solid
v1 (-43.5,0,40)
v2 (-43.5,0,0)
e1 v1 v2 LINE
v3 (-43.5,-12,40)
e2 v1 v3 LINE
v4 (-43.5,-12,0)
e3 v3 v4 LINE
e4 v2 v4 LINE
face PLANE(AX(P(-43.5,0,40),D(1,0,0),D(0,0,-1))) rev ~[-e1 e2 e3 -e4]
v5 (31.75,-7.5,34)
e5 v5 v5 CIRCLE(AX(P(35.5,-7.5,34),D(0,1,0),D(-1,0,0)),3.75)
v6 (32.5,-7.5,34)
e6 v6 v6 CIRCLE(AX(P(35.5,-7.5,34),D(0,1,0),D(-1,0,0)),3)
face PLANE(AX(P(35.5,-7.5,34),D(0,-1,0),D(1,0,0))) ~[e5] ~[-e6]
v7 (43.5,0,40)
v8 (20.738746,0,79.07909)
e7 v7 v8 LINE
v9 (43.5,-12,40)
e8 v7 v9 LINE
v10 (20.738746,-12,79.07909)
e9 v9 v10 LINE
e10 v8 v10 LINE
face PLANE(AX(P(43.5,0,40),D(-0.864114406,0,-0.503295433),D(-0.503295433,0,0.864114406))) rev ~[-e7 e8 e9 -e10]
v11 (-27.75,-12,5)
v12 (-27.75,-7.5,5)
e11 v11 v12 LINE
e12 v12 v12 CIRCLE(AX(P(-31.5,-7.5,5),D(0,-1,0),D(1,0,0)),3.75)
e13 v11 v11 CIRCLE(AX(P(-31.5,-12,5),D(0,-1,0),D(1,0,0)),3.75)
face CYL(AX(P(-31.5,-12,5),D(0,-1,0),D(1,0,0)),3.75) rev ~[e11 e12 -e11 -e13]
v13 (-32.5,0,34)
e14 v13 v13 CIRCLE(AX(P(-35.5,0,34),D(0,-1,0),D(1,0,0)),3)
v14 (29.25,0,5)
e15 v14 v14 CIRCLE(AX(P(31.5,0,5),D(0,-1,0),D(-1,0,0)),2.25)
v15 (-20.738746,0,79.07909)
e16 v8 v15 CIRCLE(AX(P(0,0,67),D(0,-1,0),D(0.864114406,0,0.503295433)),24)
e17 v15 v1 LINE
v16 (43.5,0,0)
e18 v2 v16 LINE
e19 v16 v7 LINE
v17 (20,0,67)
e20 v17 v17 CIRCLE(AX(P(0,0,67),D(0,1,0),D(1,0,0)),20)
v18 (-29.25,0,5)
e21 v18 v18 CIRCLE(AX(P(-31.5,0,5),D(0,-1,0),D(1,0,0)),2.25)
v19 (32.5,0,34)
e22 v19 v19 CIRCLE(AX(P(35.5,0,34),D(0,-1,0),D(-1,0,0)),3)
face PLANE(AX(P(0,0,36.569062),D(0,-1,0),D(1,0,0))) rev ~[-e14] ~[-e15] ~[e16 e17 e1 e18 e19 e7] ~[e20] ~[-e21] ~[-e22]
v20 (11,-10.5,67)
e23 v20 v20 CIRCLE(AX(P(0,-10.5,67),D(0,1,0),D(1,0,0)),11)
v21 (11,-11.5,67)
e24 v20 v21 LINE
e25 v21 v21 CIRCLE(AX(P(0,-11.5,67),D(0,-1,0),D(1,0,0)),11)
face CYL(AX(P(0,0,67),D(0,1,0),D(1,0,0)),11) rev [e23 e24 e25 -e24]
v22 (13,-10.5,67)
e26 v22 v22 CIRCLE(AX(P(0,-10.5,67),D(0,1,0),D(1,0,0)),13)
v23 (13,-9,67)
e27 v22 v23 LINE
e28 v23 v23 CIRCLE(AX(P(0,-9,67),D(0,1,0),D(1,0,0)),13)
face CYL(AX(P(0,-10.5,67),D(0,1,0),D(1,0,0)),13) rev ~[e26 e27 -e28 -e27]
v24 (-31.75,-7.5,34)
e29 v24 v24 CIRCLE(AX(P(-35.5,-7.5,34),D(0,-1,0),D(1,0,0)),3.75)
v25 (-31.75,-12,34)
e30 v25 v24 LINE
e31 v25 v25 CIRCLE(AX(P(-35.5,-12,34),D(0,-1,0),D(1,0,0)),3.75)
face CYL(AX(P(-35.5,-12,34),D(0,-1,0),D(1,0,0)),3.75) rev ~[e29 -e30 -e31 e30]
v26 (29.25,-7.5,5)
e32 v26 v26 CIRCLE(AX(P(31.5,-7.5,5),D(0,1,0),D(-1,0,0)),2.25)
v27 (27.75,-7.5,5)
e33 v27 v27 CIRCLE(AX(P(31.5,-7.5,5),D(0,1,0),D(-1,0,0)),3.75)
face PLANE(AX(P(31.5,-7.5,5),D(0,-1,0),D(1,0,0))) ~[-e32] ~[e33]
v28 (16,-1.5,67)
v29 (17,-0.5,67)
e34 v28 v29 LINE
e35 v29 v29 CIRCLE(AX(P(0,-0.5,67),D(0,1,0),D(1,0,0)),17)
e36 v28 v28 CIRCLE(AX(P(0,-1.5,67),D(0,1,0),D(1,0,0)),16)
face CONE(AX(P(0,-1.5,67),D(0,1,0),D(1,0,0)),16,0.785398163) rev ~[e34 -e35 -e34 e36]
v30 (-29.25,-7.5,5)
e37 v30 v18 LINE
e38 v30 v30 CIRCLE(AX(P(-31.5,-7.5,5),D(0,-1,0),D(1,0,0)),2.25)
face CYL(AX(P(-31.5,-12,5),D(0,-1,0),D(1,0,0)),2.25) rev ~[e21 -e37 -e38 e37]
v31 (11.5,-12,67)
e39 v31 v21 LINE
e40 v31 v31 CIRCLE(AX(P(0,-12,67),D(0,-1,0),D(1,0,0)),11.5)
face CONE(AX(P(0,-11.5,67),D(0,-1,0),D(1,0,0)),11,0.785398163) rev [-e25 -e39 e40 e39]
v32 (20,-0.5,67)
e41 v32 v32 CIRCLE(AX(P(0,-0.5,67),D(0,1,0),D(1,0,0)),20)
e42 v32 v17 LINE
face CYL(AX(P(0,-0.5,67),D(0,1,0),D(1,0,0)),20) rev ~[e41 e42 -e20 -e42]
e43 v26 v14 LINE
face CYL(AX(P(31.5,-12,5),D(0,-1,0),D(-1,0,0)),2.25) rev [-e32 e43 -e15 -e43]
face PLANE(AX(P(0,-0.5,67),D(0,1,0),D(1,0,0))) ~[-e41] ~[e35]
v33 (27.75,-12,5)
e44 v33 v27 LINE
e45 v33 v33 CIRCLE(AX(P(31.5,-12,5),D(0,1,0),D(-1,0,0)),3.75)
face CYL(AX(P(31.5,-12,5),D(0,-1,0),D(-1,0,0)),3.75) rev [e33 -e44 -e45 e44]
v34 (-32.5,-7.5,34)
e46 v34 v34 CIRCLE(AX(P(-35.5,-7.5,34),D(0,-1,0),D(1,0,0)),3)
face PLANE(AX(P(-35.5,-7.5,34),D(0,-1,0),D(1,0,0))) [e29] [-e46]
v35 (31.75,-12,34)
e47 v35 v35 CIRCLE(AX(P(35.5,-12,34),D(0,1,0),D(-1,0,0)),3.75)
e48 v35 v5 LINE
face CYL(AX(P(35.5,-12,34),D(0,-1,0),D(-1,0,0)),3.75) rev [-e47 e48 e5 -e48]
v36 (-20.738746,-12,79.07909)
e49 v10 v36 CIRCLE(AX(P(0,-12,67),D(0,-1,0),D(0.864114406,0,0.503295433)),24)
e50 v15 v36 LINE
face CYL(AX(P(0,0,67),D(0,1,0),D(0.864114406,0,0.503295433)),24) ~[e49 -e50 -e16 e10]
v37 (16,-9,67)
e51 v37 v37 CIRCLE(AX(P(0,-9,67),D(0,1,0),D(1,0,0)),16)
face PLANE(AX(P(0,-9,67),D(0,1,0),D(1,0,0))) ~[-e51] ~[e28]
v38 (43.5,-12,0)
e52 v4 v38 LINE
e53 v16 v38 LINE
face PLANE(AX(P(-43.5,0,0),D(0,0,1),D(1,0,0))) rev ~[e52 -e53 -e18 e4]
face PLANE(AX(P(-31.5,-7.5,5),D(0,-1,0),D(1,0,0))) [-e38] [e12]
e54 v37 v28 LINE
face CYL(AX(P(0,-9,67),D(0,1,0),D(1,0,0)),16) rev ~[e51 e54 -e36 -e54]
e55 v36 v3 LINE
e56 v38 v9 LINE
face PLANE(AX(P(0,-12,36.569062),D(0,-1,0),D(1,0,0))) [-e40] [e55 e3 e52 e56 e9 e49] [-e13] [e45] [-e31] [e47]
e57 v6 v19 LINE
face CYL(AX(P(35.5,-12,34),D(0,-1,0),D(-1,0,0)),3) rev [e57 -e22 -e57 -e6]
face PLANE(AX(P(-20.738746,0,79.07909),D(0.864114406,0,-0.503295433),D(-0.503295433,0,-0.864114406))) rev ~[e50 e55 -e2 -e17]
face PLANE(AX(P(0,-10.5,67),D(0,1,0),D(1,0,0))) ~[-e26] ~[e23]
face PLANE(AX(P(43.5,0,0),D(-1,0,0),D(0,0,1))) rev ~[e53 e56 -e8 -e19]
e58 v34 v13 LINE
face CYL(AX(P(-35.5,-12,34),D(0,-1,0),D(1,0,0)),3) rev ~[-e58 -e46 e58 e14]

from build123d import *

# Parameters (mm, degrees)
F0_R     = 11
F1_DEPTH = 12
F2_R     = 3
F3_DEPTH = 18
F2_R_2   = 3.75
F4_DEPTH = 4.5
F2_R_3   = 2.25
F5_DEPTH = 12.001
F6_DEPTH = 4.5
F10_SIZE = 0.5


# Not quite as in the source:
# - a pattern or mirror of a feature is missing from the dataset's text; its kind, count and spacing are read off the source's solid


with BuildPart() as f1:
    # F0 (on Front) → F1 (new body)
    with BuildSketch(Plane.XZ):
        with BuildLine():
            Line((-43.5, 40), (-43.5, 0))
            Line((-43.5, 0), (43.5, 0))
            Line((43.5, 0), (43.5, 40))
            Line((43.5, 40), (20.7387457553, 79.0790903836))
            ThreePointArc((20.7387457553, 79.0790903836), (0, 91), (-20.7387457553, 79.0790903836))
            Line((-20.7387457553, 79.0790903836), (-43.5, 40))
        make_face()
        with Locations((0, 67)):
            Circle(F0_R, mode=Mode.SUBTRACT)
    extrude(amount=F1_DEPTH)

    # F2 (on face) → F3 (cut)
    with BuildSketch(Plane.XZ.offset(12)):
        with Locations((-35.5, 34)):
            Circle(F2_R)
    f3 = extrude(amount=-F3_DEPTH, mode=Mode.SUBTRACT)

    # F3_copies: F3 across plane
    add(f3.mirror(Plane(origin=(0, 0, 0), x_dir=(0, 0, 1), z_dir=(1, 0, 0))), mode=Mode.SUBTRACT)

    # F2 (on face) → F4 (cut)
    with BuildSketch(Plane.XZ.offset(12)):
        with Locations((-35.5, 34)):
            Circle(F2_R_2)
        with Locations((-35.5, 34)):
            Circle(F2_R, mode=Mode.SUBTRACT)
    f4 = extrude(amount=-F4_DEPTH, mode=Mode.SUBTRACT)

    # F4_copies: F4 across plane
    add(f4.mirror(Plane(origin=(0, 0, 0), x_dir=(0, 0, 1), z_dir=(1, 0, 0))), mode=Mode.SUBTRACT)

    # F2 (on face) → F5 (cut, through all)
    with BuildSketch(Plane.XZ.offset(12)):
        with Locations((-31.5, 5)):
            Circle(F2_R_3)
    f5 = extrude(amount=-F5_DEPTH, mode=Mode.SUBTRACT)

    # F5_copies: F5 across plane
    add(f5.mirror(Plane(origin=(0, 0, 0), x_dir=(0, 0, 1), z_dir=(1, 0, 0))), mode=Mode.SUBTRACT)

    # F2 (on face) → F6 (cut)
    with BuildSketch(Plane.XZ.offset(12)):
        with Locations((-31.5, 5)):
            Circle(F2_R_2)
        with Locations((-31.5, 5)):
            Circle(F2_R_3, mode=Mode.SUBTRACT)
    f6 = extrude(amount=-F6_DEPTH, mode=Mode.SUBTRACT)

    # F6_copies: F6 across plane
    add(f6.mirror(Plane(origin=(0, 0, 0), x_dir=(0, 0, 1), z_dir=(1, 0, 0))), mode=Mode.SUBTRACT)

    # F8 (on offset) → F9 (revolve, cut)
    with BuildSketch(Plane.XY.offset(67)):
        Polygon((0, 0), (0, -12), (11, -12), (11, -10.5), (13, -10.5), (13, -9), (16, -9), (16, -1.5), (17, -0.5), (20, -0.5), (20, 0), align=None)
    revolve(axis=Axis((0, -9.5826864708, 67), (0, 1, 0)), mode=Mode.SUBTRACT)

    # F10
    f10_edges = [f1.edges().sort_by_distance(p)[0] for p in [
        (-11, -12, 67),
    ]]
    chamfer(f10_edges, length=F10_SIZE)


solid = f1.part
